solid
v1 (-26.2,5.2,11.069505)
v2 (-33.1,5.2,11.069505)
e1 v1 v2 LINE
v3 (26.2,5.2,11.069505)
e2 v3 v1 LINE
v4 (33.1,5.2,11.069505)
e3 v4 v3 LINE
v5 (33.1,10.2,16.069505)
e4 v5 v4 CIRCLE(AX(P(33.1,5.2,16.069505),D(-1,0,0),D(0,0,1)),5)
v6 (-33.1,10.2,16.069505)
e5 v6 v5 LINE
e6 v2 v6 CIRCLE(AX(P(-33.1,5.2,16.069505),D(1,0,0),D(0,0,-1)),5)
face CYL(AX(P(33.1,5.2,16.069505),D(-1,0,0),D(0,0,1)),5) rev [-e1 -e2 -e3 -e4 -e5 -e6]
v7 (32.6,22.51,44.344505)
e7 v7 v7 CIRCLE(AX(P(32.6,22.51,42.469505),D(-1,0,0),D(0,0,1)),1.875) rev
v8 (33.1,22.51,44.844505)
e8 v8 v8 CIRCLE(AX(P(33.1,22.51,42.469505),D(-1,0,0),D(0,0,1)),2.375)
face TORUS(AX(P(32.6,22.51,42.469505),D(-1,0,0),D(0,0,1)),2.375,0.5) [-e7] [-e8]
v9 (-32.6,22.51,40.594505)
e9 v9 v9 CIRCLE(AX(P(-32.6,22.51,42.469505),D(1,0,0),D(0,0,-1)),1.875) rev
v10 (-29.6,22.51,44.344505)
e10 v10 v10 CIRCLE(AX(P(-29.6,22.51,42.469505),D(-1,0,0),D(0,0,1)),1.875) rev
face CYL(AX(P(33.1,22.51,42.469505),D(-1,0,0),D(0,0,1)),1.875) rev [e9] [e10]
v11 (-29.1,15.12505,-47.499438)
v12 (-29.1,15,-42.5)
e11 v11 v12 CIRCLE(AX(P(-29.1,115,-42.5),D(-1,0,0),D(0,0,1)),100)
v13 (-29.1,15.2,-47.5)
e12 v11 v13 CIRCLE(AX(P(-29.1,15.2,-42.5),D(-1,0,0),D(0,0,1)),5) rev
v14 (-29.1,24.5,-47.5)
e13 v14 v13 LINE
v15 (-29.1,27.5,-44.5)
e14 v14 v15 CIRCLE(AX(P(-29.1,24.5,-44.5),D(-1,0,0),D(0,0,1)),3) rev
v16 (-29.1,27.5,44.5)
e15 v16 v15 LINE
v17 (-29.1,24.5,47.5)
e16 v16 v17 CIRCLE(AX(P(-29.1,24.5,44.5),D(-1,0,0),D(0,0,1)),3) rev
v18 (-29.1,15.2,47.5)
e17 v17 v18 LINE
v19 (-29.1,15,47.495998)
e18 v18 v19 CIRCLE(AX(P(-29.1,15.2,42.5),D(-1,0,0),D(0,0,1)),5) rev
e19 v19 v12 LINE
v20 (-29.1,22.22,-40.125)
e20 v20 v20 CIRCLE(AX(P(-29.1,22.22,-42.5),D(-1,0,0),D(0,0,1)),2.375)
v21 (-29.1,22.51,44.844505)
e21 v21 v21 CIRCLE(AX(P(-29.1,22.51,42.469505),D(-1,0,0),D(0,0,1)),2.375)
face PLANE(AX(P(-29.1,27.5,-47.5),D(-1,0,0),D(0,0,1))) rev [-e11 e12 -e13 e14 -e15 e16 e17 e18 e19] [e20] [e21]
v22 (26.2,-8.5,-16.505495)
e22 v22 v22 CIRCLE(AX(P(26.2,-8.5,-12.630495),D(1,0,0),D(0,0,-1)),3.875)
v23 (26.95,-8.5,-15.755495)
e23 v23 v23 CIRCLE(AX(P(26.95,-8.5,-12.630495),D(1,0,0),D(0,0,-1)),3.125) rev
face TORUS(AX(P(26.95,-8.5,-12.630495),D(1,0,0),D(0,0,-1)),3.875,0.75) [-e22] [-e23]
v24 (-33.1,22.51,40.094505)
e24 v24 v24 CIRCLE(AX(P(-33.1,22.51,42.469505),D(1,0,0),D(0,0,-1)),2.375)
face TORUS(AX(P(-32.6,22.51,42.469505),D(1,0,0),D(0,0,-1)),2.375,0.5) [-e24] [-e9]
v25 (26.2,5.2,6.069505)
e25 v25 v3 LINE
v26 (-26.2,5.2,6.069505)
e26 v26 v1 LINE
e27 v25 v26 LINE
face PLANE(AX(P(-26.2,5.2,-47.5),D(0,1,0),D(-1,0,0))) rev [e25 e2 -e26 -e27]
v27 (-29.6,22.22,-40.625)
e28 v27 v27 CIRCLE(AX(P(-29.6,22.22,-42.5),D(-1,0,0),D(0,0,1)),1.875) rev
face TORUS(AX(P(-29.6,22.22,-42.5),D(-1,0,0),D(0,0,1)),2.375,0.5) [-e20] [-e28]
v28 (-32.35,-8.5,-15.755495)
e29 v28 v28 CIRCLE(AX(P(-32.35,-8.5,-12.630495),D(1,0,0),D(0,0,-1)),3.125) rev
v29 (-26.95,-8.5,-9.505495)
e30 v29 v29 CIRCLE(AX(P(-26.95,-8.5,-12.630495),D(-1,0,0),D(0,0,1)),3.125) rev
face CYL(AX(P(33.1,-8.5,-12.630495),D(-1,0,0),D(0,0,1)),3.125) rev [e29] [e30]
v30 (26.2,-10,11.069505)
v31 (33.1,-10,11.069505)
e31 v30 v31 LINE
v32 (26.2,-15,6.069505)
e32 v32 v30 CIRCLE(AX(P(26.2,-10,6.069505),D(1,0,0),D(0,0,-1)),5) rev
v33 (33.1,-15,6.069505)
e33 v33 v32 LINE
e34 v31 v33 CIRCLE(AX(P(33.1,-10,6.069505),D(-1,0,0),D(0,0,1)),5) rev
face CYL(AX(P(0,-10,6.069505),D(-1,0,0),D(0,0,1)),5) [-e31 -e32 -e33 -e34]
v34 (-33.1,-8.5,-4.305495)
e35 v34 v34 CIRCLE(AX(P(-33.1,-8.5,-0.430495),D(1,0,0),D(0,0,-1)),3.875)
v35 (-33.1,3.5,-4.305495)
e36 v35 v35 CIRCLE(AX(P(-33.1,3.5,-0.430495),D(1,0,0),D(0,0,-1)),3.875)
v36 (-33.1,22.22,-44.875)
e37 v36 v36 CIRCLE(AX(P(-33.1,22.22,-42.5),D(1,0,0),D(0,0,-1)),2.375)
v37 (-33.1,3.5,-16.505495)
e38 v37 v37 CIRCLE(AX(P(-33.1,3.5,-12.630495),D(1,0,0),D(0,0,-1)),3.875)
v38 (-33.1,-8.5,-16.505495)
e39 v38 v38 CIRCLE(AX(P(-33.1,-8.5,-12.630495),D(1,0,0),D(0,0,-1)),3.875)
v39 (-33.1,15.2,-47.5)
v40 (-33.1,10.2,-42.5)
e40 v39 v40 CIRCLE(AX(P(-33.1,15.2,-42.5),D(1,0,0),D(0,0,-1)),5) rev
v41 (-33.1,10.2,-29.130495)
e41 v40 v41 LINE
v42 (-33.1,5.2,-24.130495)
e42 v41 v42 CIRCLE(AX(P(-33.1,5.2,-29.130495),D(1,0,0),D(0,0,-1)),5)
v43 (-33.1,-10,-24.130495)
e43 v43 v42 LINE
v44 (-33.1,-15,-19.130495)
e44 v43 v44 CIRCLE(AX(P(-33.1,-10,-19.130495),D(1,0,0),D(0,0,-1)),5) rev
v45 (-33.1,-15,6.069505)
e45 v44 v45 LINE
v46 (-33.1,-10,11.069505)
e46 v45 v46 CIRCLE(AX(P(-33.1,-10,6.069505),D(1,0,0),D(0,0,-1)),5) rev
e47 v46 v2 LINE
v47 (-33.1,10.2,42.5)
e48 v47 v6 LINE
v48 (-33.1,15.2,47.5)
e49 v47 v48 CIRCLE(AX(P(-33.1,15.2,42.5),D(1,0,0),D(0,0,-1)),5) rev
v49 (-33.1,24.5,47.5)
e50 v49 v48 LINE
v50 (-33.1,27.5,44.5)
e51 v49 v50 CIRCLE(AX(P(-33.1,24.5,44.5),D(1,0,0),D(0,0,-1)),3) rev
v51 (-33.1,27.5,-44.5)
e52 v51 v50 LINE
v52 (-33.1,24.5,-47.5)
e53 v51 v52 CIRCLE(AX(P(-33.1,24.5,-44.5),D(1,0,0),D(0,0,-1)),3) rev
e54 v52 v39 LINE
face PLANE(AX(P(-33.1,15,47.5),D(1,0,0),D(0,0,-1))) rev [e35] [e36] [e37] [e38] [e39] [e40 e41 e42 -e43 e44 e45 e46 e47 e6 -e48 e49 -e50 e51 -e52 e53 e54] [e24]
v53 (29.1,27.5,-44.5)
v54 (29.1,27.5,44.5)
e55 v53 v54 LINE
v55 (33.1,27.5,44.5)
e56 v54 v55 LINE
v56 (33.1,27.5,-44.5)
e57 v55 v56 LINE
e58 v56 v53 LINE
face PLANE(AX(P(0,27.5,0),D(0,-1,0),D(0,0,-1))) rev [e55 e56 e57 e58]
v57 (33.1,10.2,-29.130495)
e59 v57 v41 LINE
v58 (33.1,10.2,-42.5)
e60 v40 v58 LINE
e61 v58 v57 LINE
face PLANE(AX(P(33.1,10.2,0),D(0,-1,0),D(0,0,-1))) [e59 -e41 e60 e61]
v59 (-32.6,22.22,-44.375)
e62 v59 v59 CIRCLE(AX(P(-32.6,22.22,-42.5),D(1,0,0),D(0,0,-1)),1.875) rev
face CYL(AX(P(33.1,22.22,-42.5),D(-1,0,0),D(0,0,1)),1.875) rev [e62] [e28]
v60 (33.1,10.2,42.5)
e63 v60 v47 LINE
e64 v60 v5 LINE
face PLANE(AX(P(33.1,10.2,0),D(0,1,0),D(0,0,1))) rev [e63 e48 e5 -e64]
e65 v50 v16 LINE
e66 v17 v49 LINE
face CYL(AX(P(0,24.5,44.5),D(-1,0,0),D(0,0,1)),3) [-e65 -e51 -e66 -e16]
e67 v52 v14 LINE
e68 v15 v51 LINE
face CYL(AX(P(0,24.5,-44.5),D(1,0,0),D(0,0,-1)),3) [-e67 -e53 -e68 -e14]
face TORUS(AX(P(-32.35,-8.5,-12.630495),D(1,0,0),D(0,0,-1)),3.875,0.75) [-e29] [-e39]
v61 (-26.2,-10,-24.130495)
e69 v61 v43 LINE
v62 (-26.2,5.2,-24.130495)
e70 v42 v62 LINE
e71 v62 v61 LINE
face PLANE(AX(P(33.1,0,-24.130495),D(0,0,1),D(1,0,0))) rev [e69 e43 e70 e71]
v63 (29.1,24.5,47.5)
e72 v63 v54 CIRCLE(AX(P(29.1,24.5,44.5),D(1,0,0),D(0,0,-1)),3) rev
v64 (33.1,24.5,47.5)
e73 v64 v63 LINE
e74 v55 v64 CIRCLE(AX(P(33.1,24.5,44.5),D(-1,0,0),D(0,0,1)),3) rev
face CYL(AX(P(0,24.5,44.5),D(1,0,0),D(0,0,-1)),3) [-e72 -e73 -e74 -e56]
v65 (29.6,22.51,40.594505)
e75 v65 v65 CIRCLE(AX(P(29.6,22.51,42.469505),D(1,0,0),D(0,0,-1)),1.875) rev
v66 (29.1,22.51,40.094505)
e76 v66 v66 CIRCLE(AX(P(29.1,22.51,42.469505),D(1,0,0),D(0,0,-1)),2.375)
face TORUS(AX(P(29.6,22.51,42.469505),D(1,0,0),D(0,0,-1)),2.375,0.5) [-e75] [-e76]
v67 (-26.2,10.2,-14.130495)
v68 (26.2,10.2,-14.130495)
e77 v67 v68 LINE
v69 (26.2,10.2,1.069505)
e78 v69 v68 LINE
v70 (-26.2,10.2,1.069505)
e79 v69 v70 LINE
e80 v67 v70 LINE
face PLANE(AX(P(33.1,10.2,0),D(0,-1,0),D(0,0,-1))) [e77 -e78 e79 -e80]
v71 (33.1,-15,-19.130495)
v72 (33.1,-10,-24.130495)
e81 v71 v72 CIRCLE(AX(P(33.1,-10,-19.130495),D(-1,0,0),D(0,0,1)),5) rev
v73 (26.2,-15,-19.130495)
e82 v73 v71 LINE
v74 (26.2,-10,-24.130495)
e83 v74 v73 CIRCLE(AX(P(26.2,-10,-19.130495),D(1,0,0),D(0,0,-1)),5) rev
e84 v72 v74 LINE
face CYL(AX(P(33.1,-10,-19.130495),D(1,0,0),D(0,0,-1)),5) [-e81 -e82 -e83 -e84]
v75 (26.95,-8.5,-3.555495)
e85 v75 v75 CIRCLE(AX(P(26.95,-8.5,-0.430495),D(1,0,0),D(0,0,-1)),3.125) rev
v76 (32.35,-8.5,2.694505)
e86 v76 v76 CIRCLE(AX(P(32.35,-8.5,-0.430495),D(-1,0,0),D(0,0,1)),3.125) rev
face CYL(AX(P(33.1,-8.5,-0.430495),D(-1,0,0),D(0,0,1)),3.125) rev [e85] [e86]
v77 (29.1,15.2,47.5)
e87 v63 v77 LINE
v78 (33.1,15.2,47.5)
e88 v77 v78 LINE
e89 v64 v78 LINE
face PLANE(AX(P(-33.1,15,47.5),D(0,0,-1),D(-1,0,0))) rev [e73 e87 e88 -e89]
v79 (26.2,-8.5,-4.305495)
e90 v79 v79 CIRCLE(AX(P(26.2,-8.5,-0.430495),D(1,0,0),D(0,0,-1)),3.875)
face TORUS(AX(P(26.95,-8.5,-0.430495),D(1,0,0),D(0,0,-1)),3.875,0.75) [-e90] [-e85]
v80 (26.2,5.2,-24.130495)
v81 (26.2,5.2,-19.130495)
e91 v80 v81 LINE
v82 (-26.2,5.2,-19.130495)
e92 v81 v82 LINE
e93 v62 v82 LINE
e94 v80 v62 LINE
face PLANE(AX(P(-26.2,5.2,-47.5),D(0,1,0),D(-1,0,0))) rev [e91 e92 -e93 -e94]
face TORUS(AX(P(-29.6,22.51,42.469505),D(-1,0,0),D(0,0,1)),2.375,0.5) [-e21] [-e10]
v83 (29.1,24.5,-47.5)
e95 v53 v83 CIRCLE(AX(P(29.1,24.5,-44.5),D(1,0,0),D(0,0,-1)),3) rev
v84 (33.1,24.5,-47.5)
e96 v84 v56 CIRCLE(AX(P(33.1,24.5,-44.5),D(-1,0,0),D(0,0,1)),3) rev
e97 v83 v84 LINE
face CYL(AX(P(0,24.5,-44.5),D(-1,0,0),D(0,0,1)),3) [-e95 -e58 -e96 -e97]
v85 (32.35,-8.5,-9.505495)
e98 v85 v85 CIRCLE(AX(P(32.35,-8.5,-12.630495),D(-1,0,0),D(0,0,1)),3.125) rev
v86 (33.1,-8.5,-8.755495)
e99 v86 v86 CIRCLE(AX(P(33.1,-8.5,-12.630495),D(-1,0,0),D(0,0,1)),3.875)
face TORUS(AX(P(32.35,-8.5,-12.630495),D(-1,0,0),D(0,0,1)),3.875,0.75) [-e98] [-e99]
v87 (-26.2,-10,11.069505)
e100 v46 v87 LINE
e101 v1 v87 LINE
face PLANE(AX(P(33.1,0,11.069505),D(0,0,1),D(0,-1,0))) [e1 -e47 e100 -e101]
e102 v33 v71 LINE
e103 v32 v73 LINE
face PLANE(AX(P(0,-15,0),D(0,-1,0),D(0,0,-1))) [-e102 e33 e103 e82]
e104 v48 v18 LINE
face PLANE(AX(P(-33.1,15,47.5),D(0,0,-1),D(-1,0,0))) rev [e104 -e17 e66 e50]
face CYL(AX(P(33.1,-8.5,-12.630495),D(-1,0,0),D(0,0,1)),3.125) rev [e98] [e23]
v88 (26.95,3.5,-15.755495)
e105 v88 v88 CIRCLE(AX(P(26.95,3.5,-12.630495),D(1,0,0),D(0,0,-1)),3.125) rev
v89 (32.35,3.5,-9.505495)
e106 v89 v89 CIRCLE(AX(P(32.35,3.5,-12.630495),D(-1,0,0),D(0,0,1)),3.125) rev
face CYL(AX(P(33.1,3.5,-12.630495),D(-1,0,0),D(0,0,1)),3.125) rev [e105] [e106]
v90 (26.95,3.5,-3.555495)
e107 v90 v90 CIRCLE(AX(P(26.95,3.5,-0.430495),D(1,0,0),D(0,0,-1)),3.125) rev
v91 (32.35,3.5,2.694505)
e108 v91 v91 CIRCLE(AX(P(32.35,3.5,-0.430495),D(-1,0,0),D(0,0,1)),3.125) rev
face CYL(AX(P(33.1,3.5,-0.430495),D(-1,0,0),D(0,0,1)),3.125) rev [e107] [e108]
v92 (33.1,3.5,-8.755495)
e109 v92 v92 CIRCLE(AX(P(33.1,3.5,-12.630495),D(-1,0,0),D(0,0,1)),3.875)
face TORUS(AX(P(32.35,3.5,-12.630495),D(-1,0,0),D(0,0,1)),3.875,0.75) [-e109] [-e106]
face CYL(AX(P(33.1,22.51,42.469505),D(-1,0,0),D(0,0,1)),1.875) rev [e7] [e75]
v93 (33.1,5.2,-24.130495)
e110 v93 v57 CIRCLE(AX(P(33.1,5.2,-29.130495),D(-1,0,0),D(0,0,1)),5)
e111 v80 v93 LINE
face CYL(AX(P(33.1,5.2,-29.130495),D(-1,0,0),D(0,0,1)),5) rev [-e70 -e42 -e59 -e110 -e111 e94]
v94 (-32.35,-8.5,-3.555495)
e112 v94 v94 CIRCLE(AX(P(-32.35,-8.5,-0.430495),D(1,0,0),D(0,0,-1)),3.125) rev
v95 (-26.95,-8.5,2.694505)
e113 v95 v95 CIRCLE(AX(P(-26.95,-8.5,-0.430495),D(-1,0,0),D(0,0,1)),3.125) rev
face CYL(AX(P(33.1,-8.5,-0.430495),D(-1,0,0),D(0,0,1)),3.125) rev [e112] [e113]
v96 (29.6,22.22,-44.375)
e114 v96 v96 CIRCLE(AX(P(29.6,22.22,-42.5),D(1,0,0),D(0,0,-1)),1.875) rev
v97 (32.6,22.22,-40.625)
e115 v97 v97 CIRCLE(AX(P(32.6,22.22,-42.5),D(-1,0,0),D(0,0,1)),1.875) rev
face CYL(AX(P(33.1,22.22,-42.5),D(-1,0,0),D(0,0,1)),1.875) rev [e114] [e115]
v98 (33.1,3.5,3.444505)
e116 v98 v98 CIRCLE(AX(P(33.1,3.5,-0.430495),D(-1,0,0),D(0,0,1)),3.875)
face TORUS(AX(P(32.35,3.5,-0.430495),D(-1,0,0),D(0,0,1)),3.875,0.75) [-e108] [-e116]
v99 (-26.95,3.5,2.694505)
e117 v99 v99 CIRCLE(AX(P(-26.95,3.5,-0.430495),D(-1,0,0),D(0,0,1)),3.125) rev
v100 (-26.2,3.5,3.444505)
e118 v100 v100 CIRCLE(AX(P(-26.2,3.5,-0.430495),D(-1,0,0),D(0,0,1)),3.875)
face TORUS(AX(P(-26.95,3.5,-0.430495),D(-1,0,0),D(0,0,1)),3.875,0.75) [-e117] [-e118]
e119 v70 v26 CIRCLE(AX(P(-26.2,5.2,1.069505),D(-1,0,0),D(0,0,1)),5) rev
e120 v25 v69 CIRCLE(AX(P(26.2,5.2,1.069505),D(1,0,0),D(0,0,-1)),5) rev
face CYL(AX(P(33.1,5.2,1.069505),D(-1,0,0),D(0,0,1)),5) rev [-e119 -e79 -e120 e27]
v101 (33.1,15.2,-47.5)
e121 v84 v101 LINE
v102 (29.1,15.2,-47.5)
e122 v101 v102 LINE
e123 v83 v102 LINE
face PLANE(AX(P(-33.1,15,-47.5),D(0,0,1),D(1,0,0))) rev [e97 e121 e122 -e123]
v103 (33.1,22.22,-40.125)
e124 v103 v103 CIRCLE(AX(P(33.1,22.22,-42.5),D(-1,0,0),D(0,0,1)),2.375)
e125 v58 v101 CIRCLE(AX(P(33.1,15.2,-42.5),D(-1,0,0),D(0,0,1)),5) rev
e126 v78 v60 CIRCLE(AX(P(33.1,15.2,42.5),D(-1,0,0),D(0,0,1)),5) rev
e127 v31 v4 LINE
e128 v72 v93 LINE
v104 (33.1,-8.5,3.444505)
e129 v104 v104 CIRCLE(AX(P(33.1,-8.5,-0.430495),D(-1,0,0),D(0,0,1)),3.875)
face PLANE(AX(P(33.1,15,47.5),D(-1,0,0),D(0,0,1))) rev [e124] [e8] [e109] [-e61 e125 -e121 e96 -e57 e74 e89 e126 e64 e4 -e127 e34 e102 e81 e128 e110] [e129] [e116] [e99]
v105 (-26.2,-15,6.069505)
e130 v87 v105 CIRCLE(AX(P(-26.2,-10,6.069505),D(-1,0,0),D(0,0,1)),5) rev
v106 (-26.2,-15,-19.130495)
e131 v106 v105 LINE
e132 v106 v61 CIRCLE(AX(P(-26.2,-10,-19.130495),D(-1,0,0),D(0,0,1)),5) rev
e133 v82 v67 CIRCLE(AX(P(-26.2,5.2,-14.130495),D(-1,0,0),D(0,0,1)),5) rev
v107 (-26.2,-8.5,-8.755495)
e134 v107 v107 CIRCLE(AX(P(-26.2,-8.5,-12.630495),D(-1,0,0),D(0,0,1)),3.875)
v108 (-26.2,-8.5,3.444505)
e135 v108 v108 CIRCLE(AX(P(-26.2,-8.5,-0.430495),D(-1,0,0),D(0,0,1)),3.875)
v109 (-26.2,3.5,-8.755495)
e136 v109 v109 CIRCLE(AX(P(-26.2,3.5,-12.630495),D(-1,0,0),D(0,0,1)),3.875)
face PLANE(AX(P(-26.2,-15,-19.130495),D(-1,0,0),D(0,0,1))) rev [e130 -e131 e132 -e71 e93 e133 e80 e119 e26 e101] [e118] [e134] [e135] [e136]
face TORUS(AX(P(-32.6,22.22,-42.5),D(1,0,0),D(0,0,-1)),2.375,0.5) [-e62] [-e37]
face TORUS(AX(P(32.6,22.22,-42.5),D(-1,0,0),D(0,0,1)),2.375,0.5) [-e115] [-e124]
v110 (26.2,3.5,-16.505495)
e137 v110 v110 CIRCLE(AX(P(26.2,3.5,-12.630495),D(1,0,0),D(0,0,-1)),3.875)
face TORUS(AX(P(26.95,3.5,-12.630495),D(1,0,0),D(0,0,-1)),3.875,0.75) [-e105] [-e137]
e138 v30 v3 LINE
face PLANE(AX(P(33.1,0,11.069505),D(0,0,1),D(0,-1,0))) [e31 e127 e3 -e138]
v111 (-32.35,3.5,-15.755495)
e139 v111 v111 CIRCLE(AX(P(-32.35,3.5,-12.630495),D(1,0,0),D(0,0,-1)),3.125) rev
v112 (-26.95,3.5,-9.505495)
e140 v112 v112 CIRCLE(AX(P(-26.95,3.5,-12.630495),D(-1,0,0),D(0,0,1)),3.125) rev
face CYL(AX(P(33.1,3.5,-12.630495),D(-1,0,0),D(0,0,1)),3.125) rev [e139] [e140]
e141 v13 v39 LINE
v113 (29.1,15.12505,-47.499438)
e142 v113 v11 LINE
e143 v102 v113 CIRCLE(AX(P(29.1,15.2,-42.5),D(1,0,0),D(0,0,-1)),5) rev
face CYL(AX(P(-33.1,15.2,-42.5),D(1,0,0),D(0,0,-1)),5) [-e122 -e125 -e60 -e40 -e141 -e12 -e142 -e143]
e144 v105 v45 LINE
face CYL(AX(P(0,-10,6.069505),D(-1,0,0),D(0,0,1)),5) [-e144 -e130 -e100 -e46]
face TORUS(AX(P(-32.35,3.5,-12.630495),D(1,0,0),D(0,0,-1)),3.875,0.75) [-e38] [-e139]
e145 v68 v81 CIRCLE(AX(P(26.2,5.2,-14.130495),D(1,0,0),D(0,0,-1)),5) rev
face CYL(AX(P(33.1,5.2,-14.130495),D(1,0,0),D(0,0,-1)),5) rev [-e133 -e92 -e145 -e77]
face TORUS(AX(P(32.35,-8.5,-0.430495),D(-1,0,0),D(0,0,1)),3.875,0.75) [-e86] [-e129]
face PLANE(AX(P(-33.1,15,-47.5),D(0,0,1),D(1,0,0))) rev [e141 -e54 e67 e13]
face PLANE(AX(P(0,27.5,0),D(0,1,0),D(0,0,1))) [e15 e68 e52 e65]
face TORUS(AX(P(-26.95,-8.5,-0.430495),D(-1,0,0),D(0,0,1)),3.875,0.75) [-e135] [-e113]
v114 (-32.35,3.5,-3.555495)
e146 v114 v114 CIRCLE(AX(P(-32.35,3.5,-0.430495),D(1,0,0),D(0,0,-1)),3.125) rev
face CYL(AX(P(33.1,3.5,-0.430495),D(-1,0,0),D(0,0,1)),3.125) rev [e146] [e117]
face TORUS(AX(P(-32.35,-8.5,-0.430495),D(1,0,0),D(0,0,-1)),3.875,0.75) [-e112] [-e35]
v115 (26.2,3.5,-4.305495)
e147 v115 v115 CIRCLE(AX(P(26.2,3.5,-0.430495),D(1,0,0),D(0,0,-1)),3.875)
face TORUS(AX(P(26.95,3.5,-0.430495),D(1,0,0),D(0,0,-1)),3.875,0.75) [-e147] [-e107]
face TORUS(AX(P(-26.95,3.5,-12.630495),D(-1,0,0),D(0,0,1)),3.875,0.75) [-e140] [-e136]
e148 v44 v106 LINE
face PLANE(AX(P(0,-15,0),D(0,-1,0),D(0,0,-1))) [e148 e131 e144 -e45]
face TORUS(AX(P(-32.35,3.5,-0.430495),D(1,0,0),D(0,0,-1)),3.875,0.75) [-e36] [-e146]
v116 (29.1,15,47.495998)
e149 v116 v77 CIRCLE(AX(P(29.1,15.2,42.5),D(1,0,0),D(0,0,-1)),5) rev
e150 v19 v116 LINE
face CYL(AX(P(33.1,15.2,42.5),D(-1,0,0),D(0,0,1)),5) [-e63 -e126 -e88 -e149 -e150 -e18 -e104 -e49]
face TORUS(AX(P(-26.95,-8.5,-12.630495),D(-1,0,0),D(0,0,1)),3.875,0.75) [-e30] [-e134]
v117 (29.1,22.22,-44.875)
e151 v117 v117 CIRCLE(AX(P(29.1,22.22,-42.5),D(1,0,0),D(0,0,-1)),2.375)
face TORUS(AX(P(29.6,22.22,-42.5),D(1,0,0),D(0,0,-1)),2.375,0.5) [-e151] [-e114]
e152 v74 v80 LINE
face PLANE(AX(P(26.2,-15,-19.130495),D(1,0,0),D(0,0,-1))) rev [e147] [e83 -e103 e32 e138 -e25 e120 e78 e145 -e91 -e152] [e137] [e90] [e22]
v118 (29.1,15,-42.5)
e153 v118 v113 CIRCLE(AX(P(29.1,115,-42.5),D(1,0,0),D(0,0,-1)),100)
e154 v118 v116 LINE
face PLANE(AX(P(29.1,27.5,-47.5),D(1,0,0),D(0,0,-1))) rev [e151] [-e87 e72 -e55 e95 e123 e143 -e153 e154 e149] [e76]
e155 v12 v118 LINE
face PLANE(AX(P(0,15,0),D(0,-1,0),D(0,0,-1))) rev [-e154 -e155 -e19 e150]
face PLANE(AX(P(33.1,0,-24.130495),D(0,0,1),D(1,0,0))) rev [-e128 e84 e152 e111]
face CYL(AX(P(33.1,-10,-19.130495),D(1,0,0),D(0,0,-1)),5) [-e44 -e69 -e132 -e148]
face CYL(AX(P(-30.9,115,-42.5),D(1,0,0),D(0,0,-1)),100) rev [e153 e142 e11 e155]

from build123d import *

# Parameters (mm, degrees)
SKETCH1_W           = 66.2
SKETCH1_H           = 95
BOSS_EXTRUDE1_DEPTH = 15
SKETCH2_W           = 4
SKETCH2_H           = 95
BOSS_EXTRUDE2_DEPTH = 12.5
SKETCH3_R           = 1.875
CUT_EXTRUDE1_DEPTH  = 86.993836988
SKETCH4_W           = 25.2
SKETCH4_H           = 25.2
SKETCH4_W_2         = 23.369505118
SKETCH4_W_3         = 36.430494882
CUT_EXTRUDE2_DEPTH  = 86.993836988
SKETCH6_W           = 6.9
SKETCH6_H           = 25.2
BOSS_EXTRUDE3_DEPTH = 25.2
SKETCH8_R           = 3.125
CUT_EXTRUDE3_DEPTH  = 86.993836988
SKETCH9_W           = 52.4
SKETCH9_H           = 20.2
CUT_EXTRUDE4_DEPTH  = 73.67906803
BOSS_EXTRUDE4_DEPTH = 64
FILLET1_START       = -34
FILLET1_DEPTH       = 68
FILLET1_START_2     = -33.1
FILLET1_2_DEPTH     = 66.2
FILLET2_R           = 0.75
FILLET3_R           = 3
FILLET4_R           = 0.5


with BuildPart() as part:
    # Sketch1 → Boss-Extrude1 (new, symmetric)
    with BuildSketch(Plane(origin=(0, 0, 0), x_dir=(1, 0, 0), z_dir=(0, 1, 0))):
        Rectangle(SKETCH1_W, SKETCH1_H)
    extrude(amount=BOSS_EXTRUDE1_DEPTH, both=True)

    # Sketch2 → Boss-Extrude2 (add)
    with BuildSketch(Plane(origin=(0, 15, 0), x_dir=(1, 0, 0), z_dir=(0, 1, 0))):
        with Locations((-31.1, 0)):
            Rectangle(SKETCH2_W, SKETCH2_H)
        with Locations((31.1, 0)):
            Rectangle(SKETCH2_W, SKETCH2_H)
    extrude(amount=BOSS_EXTRUDE2_DEPTH)

    # Sketch3 → Cut-Extrude1 (cut, through all)
    with BuildSketch(Plane.ZY.offset(33.1)):
        with Locations((-42.5, 22.22)):
            Circle(SKETCH3_R)
        with Locations((42.469505118, 22.51)):
            Circle(SKETCH3_R)
    extrude(amount=-CUT_EXTRUDE1_DEPTH, mode=Mode.SUBTRACT)

    # Sketch4 → Cut-Extrude2 (cut, through all)
    with BuildSketch(Plane.ZY.offset(33.1)):
        with Locations((-6.530494882, -2.4)):
            Rectangle(SKETCH4_W, SKETCH4_H)
        with Locations((-35.815247441, -2.4)):
            Rectangle(SKETCH4_W_2, SKETCH4_H)
        with Locations((29.284752559, -2.4)):
            Rectangle(SKETCH4_W_3, SKETCH4_H)
    extrude(amount=-CUT_EXTRUDE2_DEPTH, mode=Mode.SUBTRACT)

    # Sketch6 → Boss-Extrude3 (add, through all)
    with BuildSketch(Plane.XZ.offset(-10.2)):
        with Locations((-29.65, -6.530494882)):
            Rectangle(SKETCH6_W, SKETCH6_H)
        with Locations((29.65, -6.530494882)):
            Rectangle(SKETCH6_W, SKETCH6_H)
    extrude(amount=BOSS_EXTRUDE3_DEPTH)

    # Sketch8 → Cut-Extrude3 (cut, through all)
    with BuildSketch(Plane.ZY.offset(33.1)):
        with Locations((-12.630494882, 3.5)):
            Circle(SKETCH8_R)
        with Locations((-12.630494882, -8.5)):
            Circle(SKETCH8_R)
        with Locations(Location((-0.430494882, -8.5, 0), (0, 0, 180))):
            Circle(SKETCH8_R)
        with Locations(Location((-0.430494882, 3.5, 0), (0, 0, 180))):
            Circle(SKETCH8_R)
    extrude(amount=-CUT_EXTRUDE3_DEPTH, mode=Mode.SUBTRACT)

    # Sketch9 → Cut-Extrude4 (cut, through all)
    with BuildSketch(Plane.XY.offset(11.069505118)):
        with Locations((0, -4.9)):
            Rectangle(SKETCH9_W, SKETCH9_H)
    extrude(amount=-CUT_EXTRUDE4_DEPTH, mode=Mode.SUBTRACT)

    # Sketch10 → Boss-Extrude4 (add)
    with BuildSketch(Plane(origin=(33.1, 0, 0), x_dir=(0, 0, -1), z_dir=(1, 0, 0))):
        with BuildLine():
            Line((42.5, 15), (47.5, 15))
            Line((47.5, 15), (47.5, 15.125078223))
            ThreePointArc((47.5, 15.125078223), (45.000782106, 15.031274446), (42.5, 15))
        make_face()
    extrude(amount=-BOSS_EXTRUDE4_DEPTH)

    # Fillet1: read off the stored shape, not the designer's step
    # Fillet1 outline → Fillet1 (cut)
    with BuildSketch(Plane.YZ.offset(FILLET1_START)):
        with BuildLine():
            Line((-15, 11.069505118), (-15, 6.069505118))
            ThreePointArc((-15, 6.069505118), (-13.535533906, 9.605039024), (-10, 11.069505118))
            Line((-10, 11.069505118), (-15, 11.069505118))
        make_face()
        with BuildLine():
            Line((10.2, 47.5), (10.2, 42.5))
            ThreePointArc((10.2, 42.5), (11.664466094, 46.035533906), (15.2, 47.5))
            Line((15.2, 47.5), (10.2, 47.5))
        make_face()
        with BuildLine():
            ThreePointArc((15.2, -47.5), (11.664466094, -46.035533906), (10.2, -42.5))
            Line((10.2, -42.5), (10.2, -47.5))
            Line((10.2, -47.5), (15.2, -47.5))
        make_face()
        with BuildLine():
            ThreePointArc((-10, -24.130494882), (-13.535533906, -22.666028788), (-15, -19.130494882))
            Line((-15, -19.130494882), (-15, -24.130494882))
            Line((-15, -24.130494882), (-10, -24.130494882))
        make_face()
    extrude(amount=FILLET1_DEPTH, mode=Mode.SUBTRACT)

    # Fillet1 2 outline → Fillet1 2 (add)
    with BuildSketch(Plane.YZ.offset(FILLET1_START_2)):
        with BuildLine():
            ThreePointArc((10.2, 16.069505118), (8.735533906, 12.533971212), (5.2, 11.069505118))
            Line((5.2, 11.069505118), (10.2, 11.069505118))
            Line((10.2, 11.069505118), (10.2, 16.069505118))
        make_face()
        with BuildLine():
            Line((10.2, -24.130494882), (5.2, -24.130494882))
            ThreePointArc((5.2, -24.130494882), (8.735533906, -25.594960976), (10.2, -29.130494882))
            Line((10.2, -29.130494882), (10.2, -24.130494882))
        make_face()
        with BuildLine():
            ThreePointArc((5.2, 6.069505118), (8.735533906, 4.605039024), (10.2, 1.069505118))
            Line((10.2, 1.069505118), (10.2, 6.069505118))
            Line((10.2, 6.069505118), (5.2, 6.069505118))
        make_face()
        with BuildLine():
            ThreePointArc((10.2, -14.130494882), (8.735533906, -17.666028788), (5.2, -19.130494882))
            Line((5.2, -19.130494882), (10.2, -19.130494882))
            Line((10.2, -19.130494882), (10.2, -14.130494882))
        make_face()
    extrude(amount=FILLET1_2_DEPTH)

    # Fillet2
    fillet2_edges = [part.edges().sort_by_distance(p)[0] for p in [
        (-26.2, 3.5, 2.694505118),
        (33.1, 3.5, 2.694505118),
        (26.2, 3.5, 2.694505118),
        (-33.1, 3.5, 2.694505118),
        (-26.2, -8.5, 2.694505118),
        (33.1, -8.5, 2.694505118),
        (26.2, -8.5, 2.694505118),
        (-33.1, -8.5, 2.694505118),
        (-26.2, -8.5, -15.755494882),
        (33.1, -8.5, -15.755494882),
        (26.2, -8.5, -15.755494882),
        (-33.1, -8.5, -15.755494882),
        (-26.2, 3.5, -15.755494882),
        (33.1, 3.5, -15.755494882),
        (26.2, 3.5, -15.755494882),
        (-33.1, 3.5, -15.755494882),
    ]]
    fillet(fillet2_edges, radius=FILLET2_R)

    # Fillet3
    fillet3_edges = [part.edges().sort_by_distance(p)[0] for p in [
        (-31.1, 27.5, 47.5),
        (-31.1, 27.5, -47.5),
        (31.1, 27.5, -47.5),
        (31.1, 27.5, 47.5),
    ]]
    fillet(fillet3_edges, radius=FILLET3_R)

    # Fillet4
    fillet4_edges = [part.edges().sort_by_distance(p)[0] for p in [
        (-29.1, 22.22, -44.375),
        (33.1, 22.22, -44.375),
        (29.1, 22.22, -44.375),
        (-33.1, 22.22, -44.375),
        (-29.1, 22.51, 40.594505118),
        (33.1, 22.51, 40.594505118),
        (29.1, 22.51, 40.594505118),
        (-33.1, 22.51, 40.594505118),
    ]]
    fillet(fillet4_edges, radius=FILLET4_R)


solid = part.part
